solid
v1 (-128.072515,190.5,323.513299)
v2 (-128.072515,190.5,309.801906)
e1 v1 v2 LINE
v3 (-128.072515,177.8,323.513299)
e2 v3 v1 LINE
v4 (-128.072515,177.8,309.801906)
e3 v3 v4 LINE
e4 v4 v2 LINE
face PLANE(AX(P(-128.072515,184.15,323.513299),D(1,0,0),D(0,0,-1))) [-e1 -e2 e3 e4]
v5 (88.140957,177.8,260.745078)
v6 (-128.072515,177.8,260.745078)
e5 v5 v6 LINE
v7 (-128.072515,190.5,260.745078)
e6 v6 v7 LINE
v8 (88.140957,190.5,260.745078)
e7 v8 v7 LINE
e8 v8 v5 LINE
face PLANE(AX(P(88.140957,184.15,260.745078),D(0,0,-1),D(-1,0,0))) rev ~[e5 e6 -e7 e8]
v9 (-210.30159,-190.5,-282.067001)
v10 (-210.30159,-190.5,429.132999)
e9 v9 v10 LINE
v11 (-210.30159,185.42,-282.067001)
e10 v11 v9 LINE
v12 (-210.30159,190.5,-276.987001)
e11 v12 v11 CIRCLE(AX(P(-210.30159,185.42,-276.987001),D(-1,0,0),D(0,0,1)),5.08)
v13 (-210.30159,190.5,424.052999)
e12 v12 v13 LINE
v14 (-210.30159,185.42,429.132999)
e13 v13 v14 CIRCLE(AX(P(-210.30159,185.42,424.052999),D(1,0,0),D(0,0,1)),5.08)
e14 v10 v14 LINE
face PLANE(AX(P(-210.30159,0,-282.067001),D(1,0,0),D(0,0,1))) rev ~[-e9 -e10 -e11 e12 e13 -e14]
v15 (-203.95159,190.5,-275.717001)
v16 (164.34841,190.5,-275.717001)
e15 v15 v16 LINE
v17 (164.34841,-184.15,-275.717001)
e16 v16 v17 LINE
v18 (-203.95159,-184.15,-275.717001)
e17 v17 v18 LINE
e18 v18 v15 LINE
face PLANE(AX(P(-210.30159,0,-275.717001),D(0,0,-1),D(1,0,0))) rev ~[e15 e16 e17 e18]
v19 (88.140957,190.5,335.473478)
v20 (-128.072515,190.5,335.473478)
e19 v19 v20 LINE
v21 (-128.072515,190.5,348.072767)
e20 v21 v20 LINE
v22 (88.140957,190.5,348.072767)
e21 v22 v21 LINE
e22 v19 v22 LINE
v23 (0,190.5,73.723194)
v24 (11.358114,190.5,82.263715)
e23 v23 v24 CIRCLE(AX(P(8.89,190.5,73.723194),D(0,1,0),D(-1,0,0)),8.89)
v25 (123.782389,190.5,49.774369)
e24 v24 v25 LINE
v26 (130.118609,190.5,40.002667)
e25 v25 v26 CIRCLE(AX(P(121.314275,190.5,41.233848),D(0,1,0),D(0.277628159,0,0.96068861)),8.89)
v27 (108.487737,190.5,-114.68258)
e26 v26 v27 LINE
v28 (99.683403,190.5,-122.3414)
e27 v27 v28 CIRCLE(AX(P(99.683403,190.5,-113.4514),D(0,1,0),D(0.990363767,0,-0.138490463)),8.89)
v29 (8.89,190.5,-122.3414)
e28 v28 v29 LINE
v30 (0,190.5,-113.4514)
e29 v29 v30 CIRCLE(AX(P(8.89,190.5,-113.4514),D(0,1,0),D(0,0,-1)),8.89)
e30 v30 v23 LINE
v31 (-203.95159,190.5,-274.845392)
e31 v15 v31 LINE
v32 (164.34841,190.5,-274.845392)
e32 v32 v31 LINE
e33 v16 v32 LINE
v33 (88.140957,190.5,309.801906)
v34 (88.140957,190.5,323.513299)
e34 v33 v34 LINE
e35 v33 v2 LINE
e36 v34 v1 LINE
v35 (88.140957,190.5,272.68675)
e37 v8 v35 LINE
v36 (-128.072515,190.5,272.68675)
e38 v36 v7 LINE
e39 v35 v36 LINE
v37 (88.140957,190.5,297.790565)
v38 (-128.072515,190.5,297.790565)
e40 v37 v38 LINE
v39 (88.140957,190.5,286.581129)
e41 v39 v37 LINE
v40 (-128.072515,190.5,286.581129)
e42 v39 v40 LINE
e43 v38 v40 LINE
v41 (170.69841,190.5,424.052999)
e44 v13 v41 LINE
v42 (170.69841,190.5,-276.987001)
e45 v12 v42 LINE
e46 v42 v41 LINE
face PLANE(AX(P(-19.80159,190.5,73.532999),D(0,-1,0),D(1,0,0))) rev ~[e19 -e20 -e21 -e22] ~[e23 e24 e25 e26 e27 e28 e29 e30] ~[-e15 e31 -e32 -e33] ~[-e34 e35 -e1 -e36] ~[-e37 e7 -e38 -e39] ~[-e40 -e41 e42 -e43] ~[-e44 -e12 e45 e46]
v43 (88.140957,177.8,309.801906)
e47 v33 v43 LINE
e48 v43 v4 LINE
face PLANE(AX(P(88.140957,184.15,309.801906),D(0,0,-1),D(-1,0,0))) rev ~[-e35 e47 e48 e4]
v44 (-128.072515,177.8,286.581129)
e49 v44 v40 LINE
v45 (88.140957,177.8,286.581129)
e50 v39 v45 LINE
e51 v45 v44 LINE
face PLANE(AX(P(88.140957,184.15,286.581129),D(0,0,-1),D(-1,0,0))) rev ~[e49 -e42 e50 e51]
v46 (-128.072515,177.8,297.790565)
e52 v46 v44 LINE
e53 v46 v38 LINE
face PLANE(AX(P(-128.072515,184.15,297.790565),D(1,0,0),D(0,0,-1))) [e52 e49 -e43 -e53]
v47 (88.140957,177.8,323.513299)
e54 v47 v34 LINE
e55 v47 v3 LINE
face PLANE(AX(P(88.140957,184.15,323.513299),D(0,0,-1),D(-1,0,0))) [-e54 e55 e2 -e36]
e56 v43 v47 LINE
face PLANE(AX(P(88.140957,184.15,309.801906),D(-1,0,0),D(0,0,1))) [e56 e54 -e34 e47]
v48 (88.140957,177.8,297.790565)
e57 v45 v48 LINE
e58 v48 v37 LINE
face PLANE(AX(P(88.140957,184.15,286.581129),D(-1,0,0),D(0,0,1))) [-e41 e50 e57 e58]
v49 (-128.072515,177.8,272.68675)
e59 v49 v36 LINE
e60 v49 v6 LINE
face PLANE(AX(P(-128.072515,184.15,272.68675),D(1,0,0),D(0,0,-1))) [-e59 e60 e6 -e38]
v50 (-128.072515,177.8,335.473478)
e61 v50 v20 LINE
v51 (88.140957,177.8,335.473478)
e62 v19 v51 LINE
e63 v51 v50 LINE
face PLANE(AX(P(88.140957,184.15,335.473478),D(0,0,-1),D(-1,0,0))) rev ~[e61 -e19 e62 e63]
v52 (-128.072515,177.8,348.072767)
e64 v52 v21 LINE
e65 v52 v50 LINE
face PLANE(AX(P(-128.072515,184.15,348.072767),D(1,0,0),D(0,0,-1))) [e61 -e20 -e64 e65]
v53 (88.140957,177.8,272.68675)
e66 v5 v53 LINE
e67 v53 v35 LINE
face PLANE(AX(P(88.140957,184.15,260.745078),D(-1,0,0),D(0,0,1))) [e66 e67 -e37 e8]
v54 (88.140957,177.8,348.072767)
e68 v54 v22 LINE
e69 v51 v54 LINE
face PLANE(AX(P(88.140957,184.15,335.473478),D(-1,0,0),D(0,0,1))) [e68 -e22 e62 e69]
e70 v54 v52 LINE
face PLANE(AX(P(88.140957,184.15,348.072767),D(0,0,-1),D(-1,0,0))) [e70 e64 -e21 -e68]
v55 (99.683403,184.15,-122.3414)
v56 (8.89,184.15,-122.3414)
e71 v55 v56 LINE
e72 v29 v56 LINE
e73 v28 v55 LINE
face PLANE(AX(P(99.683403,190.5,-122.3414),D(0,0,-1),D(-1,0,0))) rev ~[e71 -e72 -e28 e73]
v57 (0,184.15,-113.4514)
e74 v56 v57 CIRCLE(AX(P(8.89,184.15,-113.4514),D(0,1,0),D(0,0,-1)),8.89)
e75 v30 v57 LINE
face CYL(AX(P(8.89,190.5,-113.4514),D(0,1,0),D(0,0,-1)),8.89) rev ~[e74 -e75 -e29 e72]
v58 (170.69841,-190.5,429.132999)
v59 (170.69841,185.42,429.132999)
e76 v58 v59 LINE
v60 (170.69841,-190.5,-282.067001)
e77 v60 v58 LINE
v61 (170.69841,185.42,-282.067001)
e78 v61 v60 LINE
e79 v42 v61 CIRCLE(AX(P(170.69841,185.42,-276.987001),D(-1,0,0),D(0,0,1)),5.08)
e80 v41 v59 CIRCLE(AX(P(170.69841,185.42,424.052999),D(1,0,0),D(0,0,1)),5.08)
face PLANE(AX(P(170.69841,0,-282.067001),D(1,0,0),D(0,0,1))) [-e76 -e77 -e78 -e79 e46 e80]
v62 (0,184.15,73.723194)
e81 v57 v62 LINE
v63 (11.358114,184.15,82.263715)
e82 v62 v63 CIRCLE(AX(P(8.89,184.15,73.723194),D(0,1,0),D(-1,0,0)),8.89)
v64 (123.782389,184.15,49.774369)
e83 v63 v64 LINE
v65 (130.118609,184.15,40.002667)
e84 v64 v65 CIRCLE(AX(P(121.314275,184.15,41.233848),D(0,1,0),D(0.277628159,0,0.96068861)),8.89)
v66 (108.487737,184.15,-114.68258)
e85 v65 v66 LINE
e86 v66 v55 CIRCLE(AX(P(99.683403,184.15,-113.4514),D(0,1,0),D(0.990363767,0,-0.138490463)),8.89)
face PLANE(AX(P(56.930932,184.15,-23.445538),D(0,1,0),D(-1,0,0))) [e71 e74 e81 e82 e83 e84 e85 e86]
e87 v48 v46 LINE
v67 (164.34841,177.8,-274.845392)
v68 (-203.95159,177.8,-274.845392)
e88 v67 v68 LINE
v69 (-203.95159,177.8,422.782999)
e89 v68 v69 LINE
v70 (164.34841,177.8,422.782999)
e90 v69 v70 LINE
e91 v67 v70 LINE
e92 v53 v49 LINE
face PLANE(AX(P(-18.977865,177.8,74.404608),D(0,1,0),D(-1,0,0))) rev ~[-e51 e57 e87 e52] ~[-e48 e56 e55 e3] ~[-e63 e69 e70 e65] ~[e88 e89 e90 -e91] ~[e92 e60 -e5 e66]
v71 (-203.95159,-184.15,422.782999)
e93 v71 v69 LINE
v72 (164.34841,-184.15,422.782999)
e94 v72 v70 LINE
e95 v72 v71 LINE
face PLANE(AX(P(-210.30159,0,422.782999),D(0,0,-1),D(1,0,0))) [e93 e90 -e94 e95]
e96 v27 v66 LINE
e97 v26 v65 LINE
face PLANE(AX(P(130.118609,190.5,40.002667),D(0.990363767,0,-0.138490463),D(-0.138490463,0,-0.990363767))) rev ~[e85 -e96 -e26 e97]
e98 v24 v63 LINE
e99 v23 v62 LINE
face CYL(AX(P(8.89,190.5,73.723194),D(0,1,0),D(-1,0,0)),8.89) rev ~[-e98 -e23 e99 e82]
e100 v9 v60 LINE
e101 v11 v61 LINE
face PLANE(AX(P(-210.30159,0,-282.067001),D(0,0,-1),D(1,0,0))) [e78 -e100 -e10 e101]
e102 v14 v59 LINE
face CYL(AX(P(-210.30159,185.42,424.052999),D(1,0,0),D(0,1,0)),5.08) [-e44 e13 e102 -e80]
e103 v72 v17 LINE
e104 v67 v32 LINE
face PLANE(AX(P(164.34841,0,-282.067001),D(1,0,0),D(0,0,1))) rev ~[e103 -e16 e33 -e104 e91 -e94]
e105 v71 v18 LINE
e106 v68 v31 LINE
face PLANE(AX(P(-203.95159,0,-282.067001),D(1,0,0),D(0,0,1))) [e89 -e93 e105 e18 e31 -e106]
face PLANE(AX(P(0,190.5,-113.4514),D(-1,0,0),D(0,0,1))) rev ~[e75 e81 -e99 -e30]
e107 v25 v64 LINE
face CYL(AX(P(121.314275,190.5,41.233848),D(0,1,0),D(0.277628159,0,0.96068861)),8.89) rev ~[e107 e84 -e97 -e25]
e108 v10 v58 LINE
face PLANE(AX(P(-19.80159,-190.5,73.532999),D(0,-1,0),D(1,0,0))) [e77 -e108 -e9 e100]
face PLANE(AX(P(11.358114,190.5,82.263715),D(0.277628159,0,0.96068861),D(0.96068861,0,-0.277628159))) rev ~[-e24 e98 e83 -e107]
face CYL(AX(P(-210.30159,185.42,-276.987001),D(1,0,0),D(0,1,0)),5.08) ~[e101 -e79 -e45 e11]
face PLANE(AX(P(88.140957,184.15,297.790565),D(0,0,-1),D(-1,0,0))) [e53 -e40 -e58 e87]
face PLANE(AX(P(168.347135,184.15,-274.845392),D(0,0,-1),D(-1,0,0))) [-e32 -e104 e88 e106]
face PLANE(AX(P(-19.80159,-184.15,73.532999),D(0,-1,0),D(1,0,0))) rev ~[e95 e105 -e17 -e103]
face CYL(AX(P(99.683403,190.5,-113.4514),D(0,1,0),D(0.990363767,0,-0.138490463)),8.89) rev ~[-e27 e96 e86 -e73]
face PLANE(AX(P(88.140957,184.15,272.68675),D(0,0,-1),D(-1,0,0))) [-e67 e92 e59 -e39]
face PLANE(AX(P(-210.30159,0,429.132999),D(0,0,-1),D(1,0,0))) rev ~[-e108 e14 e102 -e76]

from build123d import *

# Parameters (mm, degrees)
F0_W     = 381
F0_H     = 711.2
F1_DEPTH = 190.5
F2_T     = -6.35
F4_W     = 374.65
F4_H     = 698.5
F4_W_2   = 216.2134721875
F4_H_2   = 11.9601786137
F4_H_3   = 12.0113417506
F4_H_4   = 13.8943791389
F4_H_5   = 13.2367163897
F5_DEPTH = 6.35
F6_R     = 5.08
F8_DEPTH = 6.35


# Not quite as in the source:
# - a feature names something its author has since deleted; it is built from what else it names


with BuildPart() as f1:
    # F0 (on Front) → F1 (new body, symmetric)
    with BuildSketch(Plane.XZ):
        with Locations((-19.8015896951, 73.5329994828)):
            Rectangle(F0_W, F0_H)
    extrude(amount=F1_DEPTH, both=True)

    # F2
    f2_openings = [f1.faces().sort_by_distance(p)[0] for p in [
        (-19.80159, 190.5, 73.532999),
    ]]
    offset(amount=F2_T, openings=f2_openings)

    # F4 (on offset) → F5 (join, symmetric)
    with BuildSketch(Plane(origin=(0, 184.15, 0), x_dir=(-1, 0, 0), z_dir=(0, 1, 0))):
        with Locations((18.9778648138, 74.4046084881)):
            Rectangle(F4_W, F4_H)
        Polygon((-88.1409570575, 335.4734778404), (-88.1409570575, 348.0727672577), (128.07251513, 348.0727672577), (128.07251513, 335.4734778404), (128.07251513, 323.5132992268), (128.07251513, 309.8019063473), (128.07251513, 297.7905645967), (128.07251513, 286.5811288357), (128.07251513, 272.6867496967), (128.07251513, 260.7450783253), (128.07251513, 247.5083619356), (-88.1409570575, 247.5083619356), (-88.1409570575, 260.7450783253), (-88.1409570575, 272.6867496967), (-88.1409570575, 286.5811288357), (-88.1409570575, 297.7905645967), (-88.1409570575, 309.8019063473), (-88.1409570575, 323.5132992268), align=None, mode=Mode.SUBTRACT)
        with Locations((19.9657790363, 329.4933885336)):
            Rectangle(F4_W_2, F4_H_2)
        with Locations((19.9657790363, 303.796235472)):
            Rectangle(F4_W_2, F4_H_3)
        with Locations((19.9657790363, 279.6339392662)):
            Rectangle(F4_W_2, F4_H_4)
        with Locations((19.9657790363, 254.1267201304)):
            Rectangle(F4_W_2, F4_H_5)
    extrude(amount=F5_DEPTH, both=True)

    # F6
    f6_edges = [f1.edges().sort_by_distance(p)[0] for p in [
        (-19.80159, 190.5, 429.132999),
        (-19.80159, 190.5, -282.067001),
    ]]
    fillet(f6_edges, radius=F6_R)

    # F7 (on face) → F8 (cut)
    with BuildSketch(Plane(origin=(0, 190.5, 0), x_dir=(-1, 0, 0), z_dir=(0, 1, 0))):
        with BuildLine():
            ThreePointArc((-123.7823893566, 49.7743694082), (-128.773401113, 46.0705343361), (-130.1186089124, 40.0026674482))
            Line((-130.1186089124, 40.0026674482), (-108.4877372412, -114.6825799083))
            ThreePointArc((-108.4877372412, -114.6825799083), (-105.5180801987, -120.1587572974), (-99.6834033498, -122.3413996903))
            Line((-99.6834033498, -122.3413996903), (-8.89, -122.3413996903))
            ThreePointArc((-8.89, -122.3413996903), (-2.6038207153, -119.7375789751), (0, -113.4513996903))
            Line((0, -113.4513996903), (0, 73.7231935432))
            ThreePointArc((0, 73.7231935432), (-3.5472215301, 80.8286012177), (-11.3581143356, 82.2637152852))
            Line((-11.3581143356, 82.2637152852), (-123.7823893566, 49.7743694082))
        make_face()
    extrude(amount=-F8_DEPTH, mode=Mode.SUBTRACT)


solid = f1.part
